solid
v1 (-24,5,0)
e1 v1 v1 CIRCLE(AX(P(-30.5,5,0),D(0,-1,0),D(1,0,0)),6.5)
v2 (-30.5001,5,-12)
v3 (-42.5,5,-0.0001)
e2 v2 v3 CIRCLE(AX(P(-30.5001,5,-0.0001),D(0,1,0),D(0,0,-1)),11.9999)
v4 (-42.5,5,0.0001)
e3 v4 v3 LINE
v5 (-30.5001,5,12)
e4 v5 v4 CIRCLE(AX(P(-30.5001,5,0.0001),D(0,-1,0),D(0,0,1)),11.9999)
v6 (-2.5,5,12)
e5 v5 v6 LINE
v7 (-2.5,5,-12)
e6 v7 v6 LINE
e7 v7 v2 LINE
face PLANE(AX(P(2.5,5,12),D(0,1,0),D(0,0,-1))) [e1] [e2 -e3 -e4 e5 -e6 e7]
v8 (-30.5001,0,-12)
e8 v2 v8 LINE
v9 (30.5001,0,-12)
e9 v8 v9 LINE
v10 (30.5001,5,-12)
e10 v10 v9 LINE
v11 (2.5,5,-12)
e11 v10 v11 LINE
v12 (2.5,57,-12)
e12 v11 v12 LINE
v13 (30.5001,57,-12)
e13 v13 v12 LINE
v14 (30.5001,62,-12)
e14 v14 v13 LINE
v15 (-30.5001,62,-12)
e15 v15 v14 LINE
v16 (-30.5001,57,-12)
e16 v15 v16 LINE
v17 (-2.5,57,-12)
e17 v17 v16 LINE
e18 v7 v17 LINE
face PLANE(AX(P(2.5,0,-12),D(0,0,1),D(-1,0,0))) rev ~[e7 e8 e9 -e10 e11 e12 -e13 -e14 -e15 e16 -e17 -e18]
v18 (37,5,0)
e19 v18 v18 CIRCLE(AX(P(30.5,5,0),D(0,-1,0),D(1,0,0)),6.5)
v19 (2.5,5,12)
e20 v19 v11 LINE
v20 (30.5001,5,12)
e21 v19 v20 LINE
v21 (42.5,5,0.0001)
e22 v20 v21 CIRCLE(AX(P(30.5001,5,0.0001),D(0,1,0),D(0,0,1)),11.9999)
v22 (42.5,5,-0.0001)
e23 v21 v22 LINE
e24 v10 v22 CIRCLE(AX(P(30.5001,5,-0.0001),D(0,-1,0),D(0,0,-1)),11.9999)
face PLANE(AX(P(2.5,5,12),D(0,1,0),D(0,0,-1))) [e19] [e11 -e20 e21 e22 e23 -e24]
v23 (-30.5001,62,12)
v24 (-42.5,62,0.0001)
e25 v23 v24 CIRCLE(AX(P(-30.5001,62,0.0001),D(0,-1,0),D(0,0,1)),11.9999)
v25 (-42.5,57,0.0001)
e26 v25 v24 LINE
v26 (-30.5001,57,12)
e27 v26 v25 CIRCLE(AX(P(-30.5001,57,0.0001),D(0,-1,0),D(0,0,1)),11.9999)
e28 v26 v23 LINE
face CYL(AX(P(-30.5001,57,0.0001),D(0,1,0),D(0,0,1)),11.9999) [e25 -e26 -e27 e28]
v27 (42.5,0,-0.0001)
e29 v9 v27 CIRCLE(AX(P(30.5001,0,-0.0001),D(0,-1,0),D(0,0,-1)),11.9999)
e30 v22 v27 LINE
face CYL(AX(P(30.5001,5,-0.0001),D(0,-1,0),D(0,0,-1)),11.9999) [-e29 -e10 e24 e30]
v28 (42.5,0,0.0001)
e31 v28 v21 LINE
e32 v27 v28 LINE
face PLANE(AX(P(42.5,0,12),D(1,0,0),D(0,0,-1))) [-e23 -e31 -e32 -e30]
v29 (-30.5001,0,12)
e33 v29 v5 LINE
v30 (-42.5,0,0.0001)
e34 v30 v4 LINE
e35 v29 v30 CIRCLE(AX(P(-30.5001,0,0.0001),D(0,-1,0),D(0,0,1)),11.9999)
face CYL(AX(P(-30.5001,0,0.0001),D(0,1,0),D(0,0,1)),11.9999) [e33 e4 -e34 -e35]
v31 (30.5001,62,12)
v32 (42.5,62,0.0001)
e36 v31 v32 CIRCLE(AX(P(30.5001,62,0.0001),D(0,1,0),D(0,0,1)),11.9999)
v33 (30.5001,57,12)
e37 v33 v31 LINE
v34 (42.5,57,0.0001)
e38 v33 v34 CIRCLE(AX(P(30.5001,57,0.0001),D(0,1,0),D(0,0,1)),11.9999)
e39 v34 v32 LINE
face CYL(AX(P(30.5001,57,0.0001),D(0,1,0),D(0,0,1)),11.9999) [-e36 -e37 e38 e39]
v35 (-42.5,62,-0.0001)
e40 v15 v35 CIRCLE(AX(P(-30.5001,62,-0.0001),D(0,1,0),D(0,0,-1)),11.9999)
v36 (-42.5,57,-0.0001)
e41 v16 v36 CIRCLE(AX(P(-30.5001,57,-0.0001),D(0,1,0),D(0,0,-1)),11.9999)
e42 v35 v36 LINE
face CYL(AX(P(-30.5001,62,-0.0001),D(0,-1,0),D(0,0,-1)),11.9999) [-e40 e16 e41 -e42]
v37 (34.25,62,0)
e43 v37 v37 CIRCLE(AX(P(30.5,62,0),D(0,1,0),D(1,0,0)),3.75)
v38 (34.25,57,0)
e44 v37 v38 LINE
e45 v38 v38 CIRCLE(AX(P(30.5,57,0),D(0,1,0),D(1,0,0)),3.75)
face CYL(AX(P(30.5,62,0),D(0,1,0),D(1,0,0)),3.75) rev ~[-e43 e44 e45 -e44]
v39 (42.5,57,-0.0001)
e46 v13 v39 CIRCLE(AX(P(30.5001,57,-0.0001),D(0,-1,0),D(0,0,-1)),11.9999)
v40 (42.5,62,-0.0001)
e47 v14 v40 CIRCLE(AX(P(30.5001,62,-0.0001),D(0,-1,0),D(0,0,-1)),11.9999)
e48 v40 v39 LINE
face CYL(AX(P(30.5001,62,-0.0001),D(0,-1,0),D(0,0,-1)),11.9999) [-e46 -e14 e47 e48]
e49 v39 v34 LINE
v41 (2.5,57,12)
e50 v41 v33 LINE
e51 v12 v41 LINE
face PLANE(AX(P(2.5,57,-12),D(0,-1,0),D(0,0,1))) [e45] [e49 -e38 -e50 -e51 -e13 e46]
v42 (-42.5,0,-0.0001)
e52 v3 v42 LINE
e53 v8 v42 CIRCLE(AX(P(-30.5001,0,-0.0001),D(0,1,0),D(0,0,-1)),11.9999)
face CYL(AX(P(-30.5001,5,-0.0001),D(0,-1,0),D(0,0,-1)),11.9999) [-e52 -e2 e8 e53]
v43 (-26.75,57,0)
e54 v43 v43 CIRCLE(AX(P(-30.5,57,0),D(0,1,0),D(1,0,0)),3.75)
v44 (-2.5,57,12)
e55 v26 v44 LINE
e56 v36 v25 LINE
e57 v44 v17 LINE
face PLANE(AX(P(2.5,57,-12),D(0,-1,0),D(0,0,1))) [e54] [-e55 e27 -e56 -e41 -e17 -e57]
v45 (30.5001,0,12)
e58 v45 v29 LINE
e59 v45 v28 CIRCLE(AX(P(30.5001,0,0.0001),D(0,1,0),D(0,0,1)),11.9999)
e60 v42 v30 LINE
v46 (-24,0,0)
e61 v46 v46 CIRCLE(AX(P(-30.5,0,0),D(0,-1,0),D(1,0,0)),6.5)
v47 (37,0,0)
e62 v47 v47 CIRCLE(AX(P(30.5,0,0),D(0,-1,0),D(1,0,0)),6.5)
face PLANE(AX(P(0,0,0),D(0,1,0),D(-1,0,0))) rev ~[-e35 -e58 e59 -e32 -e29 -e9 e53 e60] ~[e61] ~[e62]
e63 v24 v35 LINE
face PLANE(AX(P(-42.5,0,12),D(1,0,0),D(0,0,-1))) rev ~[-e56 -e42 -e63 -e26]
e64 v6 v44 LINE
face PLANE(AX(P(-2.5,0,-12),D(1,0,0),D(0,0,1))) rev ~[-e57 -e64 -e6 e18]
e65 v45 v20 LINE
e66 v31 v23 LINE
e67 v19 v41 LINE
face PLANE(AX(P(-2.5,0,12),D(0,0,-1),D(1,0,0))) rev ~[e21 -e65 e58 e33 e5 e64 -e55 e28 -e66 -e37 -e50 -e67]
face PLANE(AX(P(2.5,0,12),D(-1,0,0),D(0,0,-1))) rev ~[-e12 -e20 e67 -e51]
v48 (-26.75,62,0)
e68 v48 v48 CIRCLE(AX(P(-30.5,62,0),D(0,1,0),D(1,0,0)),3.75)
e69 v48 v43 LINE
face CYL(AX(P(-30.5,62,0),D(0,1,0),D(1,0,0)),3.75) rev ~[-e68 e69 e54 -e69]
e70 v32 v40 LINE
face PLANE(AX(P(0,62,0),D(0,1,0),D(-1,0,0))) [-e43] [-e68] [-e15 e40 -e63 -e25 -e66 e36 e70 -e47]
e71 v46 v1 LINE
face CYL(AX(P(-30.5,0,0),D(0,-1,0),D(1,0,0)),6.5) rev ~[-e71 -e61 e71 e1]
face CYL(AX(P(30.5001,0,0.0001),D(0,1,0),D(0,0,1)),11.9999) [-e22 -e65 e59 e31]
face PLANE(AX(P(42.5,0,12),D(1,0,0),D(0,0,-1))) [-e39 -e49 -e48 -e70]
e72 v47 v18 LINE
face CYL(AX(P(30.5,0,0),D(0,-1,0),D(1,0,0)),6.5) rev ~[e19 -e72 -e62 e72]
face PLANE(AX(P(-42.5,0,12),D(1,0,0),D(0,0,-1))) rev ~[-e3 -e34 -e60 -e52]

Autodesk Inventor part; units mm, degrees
ref_plane "YZ Plane" through (0, 0, 0) normal (1, 0, 0) x (0, 1, 0)
ref_plane "XZ Plane" through (0, 0, 0) normal (0, 1, 0) x (-1, 0, 0)
ref_plane "XY Plane" through (0, 0, 0) normal (0, 0, 1) x (1, 0, 0)
sketch "Sketch3" plane through (0, 0, 0) normal (0, 1, 0) x (-1, 0, 0)
  line L0 (2.5, 12) -> (-2.5, 12)
  line L1 (-2.5, 12) -> (-2.5, -12)
  line L2 (-2.5, -12) -> (2.5, -12)
  line L3 (2.5, -12) -> (2.5, 12)
  point P0 (0, 0)
  point P1 (0, 12)
  point P2 (2.5, 0)
  dimension "d6" = 5
  dimension "d7" = 24
extrude "Extrusion3" add sketch "Sketch3" along normal blind 62
sketch "Sketch4" plane through (2.5, 0, 12) normal (1, 0, 0) x (0, 0, -1)
  line L0 (0, 62) -> (24, 62)
  line L1 (24, 62) -> (24, 57)
  line L2 (24, 57) -> (0, 57)
  line L3 (0, 57) -> (0, 62)
  line L4 (0, 5) -> (24, 5)
  line L5 (24, 5) -> (24, 0)
  line L6 (24, 0) -> (0, 0)
  line L7 (0, 0) -> (0, 5)
  line L8 (0, 62) -> (24, 62) projected
  line L9 (0, 0) -> (24, 0) projected
  line L10 (0, 0) -> (0, 62) projected
  point P0 (12, 0)
  point P1 (12, 62)
  point P2 (12, 0)
  point P3 (12, 57)
  point P4 (12, 62)
  point P5 (12, 5)
  point P6 (12, 0)
  point P7 (0, 59.5)
  dimension "d10" = 5
extrude "Extrusion4" add sketch "Sketch4" along normal blind 40 and the other way blind 45
fillet "Fillet4" radius 12 8 edges at (42.5, 2.5, -12) (42.5, 2.5, 12) (42.5, 59.5, 12) (42.5, 59.5, -12) (-42.5, 59.5, 12) (-42.5, 2.5, 12) (-42.5, 59.5, -12) (-42.5, 2.5, -12)
sketch "Sketch8" plane through (0, 62, 0) normal (0, 1, 0) x (1, 0, 0)
  circle A0 centre (-30.5, 0) radius 3.75
  circle A1 centre (30.5, 0) radius 3.75
  arc A2 (-30.5, 12) -> (-30.5, -12) centre (-30.5, 0) ccw projected
  arc A3 (30.5, -12) -> (30.5, 12) centre (30.5, 0) ccw projected
  point P0 (0, 0)
  dimension "d27" = 7.5
extrude "Extrusion7" cut sketch "Sketch8" against normal up to surface (5 mm away)
sketch "Sketch9" plane through (0, 0, 0) normal (0, -1, 0) x (1, 0, 0)
  circle A0 centre (-30.5, 0) radius 6.5
  circle A1 centre (30.5, 0) radius 6.5
  arc A2 (-30.5, 12) -> (-30.5, -12) centre (-30.5, 0) ccw projected
  arc A3 (30.5, -12) -> (30.5, 12) centre (30.5, 0) ccw projected
  point P0 (0, 0)
  dimension "d30" = 13
extrude "Extrusion8" cut sketch "Sketch9" against normal up to next
equation "\"d6\" = b_mat_thickness"
equation "\"d7\" = sa_diameter"
equation "\"d10\" = b_mat_thickness"
equation "\"d24\" = d11 + b_mat_thickness"
equation "\"d26\" = 0.5 * sa_diameter"
equation "\"d30\" = bb_outer_diameter"
equation "\"b_mat_thickness\" = 5"
equation "\"sa_diameter\" = 24"
equation "\"d11\" = 40"
equation "\"bb_outer_diameter\" = 13"
properties part number "Middle_leg"
